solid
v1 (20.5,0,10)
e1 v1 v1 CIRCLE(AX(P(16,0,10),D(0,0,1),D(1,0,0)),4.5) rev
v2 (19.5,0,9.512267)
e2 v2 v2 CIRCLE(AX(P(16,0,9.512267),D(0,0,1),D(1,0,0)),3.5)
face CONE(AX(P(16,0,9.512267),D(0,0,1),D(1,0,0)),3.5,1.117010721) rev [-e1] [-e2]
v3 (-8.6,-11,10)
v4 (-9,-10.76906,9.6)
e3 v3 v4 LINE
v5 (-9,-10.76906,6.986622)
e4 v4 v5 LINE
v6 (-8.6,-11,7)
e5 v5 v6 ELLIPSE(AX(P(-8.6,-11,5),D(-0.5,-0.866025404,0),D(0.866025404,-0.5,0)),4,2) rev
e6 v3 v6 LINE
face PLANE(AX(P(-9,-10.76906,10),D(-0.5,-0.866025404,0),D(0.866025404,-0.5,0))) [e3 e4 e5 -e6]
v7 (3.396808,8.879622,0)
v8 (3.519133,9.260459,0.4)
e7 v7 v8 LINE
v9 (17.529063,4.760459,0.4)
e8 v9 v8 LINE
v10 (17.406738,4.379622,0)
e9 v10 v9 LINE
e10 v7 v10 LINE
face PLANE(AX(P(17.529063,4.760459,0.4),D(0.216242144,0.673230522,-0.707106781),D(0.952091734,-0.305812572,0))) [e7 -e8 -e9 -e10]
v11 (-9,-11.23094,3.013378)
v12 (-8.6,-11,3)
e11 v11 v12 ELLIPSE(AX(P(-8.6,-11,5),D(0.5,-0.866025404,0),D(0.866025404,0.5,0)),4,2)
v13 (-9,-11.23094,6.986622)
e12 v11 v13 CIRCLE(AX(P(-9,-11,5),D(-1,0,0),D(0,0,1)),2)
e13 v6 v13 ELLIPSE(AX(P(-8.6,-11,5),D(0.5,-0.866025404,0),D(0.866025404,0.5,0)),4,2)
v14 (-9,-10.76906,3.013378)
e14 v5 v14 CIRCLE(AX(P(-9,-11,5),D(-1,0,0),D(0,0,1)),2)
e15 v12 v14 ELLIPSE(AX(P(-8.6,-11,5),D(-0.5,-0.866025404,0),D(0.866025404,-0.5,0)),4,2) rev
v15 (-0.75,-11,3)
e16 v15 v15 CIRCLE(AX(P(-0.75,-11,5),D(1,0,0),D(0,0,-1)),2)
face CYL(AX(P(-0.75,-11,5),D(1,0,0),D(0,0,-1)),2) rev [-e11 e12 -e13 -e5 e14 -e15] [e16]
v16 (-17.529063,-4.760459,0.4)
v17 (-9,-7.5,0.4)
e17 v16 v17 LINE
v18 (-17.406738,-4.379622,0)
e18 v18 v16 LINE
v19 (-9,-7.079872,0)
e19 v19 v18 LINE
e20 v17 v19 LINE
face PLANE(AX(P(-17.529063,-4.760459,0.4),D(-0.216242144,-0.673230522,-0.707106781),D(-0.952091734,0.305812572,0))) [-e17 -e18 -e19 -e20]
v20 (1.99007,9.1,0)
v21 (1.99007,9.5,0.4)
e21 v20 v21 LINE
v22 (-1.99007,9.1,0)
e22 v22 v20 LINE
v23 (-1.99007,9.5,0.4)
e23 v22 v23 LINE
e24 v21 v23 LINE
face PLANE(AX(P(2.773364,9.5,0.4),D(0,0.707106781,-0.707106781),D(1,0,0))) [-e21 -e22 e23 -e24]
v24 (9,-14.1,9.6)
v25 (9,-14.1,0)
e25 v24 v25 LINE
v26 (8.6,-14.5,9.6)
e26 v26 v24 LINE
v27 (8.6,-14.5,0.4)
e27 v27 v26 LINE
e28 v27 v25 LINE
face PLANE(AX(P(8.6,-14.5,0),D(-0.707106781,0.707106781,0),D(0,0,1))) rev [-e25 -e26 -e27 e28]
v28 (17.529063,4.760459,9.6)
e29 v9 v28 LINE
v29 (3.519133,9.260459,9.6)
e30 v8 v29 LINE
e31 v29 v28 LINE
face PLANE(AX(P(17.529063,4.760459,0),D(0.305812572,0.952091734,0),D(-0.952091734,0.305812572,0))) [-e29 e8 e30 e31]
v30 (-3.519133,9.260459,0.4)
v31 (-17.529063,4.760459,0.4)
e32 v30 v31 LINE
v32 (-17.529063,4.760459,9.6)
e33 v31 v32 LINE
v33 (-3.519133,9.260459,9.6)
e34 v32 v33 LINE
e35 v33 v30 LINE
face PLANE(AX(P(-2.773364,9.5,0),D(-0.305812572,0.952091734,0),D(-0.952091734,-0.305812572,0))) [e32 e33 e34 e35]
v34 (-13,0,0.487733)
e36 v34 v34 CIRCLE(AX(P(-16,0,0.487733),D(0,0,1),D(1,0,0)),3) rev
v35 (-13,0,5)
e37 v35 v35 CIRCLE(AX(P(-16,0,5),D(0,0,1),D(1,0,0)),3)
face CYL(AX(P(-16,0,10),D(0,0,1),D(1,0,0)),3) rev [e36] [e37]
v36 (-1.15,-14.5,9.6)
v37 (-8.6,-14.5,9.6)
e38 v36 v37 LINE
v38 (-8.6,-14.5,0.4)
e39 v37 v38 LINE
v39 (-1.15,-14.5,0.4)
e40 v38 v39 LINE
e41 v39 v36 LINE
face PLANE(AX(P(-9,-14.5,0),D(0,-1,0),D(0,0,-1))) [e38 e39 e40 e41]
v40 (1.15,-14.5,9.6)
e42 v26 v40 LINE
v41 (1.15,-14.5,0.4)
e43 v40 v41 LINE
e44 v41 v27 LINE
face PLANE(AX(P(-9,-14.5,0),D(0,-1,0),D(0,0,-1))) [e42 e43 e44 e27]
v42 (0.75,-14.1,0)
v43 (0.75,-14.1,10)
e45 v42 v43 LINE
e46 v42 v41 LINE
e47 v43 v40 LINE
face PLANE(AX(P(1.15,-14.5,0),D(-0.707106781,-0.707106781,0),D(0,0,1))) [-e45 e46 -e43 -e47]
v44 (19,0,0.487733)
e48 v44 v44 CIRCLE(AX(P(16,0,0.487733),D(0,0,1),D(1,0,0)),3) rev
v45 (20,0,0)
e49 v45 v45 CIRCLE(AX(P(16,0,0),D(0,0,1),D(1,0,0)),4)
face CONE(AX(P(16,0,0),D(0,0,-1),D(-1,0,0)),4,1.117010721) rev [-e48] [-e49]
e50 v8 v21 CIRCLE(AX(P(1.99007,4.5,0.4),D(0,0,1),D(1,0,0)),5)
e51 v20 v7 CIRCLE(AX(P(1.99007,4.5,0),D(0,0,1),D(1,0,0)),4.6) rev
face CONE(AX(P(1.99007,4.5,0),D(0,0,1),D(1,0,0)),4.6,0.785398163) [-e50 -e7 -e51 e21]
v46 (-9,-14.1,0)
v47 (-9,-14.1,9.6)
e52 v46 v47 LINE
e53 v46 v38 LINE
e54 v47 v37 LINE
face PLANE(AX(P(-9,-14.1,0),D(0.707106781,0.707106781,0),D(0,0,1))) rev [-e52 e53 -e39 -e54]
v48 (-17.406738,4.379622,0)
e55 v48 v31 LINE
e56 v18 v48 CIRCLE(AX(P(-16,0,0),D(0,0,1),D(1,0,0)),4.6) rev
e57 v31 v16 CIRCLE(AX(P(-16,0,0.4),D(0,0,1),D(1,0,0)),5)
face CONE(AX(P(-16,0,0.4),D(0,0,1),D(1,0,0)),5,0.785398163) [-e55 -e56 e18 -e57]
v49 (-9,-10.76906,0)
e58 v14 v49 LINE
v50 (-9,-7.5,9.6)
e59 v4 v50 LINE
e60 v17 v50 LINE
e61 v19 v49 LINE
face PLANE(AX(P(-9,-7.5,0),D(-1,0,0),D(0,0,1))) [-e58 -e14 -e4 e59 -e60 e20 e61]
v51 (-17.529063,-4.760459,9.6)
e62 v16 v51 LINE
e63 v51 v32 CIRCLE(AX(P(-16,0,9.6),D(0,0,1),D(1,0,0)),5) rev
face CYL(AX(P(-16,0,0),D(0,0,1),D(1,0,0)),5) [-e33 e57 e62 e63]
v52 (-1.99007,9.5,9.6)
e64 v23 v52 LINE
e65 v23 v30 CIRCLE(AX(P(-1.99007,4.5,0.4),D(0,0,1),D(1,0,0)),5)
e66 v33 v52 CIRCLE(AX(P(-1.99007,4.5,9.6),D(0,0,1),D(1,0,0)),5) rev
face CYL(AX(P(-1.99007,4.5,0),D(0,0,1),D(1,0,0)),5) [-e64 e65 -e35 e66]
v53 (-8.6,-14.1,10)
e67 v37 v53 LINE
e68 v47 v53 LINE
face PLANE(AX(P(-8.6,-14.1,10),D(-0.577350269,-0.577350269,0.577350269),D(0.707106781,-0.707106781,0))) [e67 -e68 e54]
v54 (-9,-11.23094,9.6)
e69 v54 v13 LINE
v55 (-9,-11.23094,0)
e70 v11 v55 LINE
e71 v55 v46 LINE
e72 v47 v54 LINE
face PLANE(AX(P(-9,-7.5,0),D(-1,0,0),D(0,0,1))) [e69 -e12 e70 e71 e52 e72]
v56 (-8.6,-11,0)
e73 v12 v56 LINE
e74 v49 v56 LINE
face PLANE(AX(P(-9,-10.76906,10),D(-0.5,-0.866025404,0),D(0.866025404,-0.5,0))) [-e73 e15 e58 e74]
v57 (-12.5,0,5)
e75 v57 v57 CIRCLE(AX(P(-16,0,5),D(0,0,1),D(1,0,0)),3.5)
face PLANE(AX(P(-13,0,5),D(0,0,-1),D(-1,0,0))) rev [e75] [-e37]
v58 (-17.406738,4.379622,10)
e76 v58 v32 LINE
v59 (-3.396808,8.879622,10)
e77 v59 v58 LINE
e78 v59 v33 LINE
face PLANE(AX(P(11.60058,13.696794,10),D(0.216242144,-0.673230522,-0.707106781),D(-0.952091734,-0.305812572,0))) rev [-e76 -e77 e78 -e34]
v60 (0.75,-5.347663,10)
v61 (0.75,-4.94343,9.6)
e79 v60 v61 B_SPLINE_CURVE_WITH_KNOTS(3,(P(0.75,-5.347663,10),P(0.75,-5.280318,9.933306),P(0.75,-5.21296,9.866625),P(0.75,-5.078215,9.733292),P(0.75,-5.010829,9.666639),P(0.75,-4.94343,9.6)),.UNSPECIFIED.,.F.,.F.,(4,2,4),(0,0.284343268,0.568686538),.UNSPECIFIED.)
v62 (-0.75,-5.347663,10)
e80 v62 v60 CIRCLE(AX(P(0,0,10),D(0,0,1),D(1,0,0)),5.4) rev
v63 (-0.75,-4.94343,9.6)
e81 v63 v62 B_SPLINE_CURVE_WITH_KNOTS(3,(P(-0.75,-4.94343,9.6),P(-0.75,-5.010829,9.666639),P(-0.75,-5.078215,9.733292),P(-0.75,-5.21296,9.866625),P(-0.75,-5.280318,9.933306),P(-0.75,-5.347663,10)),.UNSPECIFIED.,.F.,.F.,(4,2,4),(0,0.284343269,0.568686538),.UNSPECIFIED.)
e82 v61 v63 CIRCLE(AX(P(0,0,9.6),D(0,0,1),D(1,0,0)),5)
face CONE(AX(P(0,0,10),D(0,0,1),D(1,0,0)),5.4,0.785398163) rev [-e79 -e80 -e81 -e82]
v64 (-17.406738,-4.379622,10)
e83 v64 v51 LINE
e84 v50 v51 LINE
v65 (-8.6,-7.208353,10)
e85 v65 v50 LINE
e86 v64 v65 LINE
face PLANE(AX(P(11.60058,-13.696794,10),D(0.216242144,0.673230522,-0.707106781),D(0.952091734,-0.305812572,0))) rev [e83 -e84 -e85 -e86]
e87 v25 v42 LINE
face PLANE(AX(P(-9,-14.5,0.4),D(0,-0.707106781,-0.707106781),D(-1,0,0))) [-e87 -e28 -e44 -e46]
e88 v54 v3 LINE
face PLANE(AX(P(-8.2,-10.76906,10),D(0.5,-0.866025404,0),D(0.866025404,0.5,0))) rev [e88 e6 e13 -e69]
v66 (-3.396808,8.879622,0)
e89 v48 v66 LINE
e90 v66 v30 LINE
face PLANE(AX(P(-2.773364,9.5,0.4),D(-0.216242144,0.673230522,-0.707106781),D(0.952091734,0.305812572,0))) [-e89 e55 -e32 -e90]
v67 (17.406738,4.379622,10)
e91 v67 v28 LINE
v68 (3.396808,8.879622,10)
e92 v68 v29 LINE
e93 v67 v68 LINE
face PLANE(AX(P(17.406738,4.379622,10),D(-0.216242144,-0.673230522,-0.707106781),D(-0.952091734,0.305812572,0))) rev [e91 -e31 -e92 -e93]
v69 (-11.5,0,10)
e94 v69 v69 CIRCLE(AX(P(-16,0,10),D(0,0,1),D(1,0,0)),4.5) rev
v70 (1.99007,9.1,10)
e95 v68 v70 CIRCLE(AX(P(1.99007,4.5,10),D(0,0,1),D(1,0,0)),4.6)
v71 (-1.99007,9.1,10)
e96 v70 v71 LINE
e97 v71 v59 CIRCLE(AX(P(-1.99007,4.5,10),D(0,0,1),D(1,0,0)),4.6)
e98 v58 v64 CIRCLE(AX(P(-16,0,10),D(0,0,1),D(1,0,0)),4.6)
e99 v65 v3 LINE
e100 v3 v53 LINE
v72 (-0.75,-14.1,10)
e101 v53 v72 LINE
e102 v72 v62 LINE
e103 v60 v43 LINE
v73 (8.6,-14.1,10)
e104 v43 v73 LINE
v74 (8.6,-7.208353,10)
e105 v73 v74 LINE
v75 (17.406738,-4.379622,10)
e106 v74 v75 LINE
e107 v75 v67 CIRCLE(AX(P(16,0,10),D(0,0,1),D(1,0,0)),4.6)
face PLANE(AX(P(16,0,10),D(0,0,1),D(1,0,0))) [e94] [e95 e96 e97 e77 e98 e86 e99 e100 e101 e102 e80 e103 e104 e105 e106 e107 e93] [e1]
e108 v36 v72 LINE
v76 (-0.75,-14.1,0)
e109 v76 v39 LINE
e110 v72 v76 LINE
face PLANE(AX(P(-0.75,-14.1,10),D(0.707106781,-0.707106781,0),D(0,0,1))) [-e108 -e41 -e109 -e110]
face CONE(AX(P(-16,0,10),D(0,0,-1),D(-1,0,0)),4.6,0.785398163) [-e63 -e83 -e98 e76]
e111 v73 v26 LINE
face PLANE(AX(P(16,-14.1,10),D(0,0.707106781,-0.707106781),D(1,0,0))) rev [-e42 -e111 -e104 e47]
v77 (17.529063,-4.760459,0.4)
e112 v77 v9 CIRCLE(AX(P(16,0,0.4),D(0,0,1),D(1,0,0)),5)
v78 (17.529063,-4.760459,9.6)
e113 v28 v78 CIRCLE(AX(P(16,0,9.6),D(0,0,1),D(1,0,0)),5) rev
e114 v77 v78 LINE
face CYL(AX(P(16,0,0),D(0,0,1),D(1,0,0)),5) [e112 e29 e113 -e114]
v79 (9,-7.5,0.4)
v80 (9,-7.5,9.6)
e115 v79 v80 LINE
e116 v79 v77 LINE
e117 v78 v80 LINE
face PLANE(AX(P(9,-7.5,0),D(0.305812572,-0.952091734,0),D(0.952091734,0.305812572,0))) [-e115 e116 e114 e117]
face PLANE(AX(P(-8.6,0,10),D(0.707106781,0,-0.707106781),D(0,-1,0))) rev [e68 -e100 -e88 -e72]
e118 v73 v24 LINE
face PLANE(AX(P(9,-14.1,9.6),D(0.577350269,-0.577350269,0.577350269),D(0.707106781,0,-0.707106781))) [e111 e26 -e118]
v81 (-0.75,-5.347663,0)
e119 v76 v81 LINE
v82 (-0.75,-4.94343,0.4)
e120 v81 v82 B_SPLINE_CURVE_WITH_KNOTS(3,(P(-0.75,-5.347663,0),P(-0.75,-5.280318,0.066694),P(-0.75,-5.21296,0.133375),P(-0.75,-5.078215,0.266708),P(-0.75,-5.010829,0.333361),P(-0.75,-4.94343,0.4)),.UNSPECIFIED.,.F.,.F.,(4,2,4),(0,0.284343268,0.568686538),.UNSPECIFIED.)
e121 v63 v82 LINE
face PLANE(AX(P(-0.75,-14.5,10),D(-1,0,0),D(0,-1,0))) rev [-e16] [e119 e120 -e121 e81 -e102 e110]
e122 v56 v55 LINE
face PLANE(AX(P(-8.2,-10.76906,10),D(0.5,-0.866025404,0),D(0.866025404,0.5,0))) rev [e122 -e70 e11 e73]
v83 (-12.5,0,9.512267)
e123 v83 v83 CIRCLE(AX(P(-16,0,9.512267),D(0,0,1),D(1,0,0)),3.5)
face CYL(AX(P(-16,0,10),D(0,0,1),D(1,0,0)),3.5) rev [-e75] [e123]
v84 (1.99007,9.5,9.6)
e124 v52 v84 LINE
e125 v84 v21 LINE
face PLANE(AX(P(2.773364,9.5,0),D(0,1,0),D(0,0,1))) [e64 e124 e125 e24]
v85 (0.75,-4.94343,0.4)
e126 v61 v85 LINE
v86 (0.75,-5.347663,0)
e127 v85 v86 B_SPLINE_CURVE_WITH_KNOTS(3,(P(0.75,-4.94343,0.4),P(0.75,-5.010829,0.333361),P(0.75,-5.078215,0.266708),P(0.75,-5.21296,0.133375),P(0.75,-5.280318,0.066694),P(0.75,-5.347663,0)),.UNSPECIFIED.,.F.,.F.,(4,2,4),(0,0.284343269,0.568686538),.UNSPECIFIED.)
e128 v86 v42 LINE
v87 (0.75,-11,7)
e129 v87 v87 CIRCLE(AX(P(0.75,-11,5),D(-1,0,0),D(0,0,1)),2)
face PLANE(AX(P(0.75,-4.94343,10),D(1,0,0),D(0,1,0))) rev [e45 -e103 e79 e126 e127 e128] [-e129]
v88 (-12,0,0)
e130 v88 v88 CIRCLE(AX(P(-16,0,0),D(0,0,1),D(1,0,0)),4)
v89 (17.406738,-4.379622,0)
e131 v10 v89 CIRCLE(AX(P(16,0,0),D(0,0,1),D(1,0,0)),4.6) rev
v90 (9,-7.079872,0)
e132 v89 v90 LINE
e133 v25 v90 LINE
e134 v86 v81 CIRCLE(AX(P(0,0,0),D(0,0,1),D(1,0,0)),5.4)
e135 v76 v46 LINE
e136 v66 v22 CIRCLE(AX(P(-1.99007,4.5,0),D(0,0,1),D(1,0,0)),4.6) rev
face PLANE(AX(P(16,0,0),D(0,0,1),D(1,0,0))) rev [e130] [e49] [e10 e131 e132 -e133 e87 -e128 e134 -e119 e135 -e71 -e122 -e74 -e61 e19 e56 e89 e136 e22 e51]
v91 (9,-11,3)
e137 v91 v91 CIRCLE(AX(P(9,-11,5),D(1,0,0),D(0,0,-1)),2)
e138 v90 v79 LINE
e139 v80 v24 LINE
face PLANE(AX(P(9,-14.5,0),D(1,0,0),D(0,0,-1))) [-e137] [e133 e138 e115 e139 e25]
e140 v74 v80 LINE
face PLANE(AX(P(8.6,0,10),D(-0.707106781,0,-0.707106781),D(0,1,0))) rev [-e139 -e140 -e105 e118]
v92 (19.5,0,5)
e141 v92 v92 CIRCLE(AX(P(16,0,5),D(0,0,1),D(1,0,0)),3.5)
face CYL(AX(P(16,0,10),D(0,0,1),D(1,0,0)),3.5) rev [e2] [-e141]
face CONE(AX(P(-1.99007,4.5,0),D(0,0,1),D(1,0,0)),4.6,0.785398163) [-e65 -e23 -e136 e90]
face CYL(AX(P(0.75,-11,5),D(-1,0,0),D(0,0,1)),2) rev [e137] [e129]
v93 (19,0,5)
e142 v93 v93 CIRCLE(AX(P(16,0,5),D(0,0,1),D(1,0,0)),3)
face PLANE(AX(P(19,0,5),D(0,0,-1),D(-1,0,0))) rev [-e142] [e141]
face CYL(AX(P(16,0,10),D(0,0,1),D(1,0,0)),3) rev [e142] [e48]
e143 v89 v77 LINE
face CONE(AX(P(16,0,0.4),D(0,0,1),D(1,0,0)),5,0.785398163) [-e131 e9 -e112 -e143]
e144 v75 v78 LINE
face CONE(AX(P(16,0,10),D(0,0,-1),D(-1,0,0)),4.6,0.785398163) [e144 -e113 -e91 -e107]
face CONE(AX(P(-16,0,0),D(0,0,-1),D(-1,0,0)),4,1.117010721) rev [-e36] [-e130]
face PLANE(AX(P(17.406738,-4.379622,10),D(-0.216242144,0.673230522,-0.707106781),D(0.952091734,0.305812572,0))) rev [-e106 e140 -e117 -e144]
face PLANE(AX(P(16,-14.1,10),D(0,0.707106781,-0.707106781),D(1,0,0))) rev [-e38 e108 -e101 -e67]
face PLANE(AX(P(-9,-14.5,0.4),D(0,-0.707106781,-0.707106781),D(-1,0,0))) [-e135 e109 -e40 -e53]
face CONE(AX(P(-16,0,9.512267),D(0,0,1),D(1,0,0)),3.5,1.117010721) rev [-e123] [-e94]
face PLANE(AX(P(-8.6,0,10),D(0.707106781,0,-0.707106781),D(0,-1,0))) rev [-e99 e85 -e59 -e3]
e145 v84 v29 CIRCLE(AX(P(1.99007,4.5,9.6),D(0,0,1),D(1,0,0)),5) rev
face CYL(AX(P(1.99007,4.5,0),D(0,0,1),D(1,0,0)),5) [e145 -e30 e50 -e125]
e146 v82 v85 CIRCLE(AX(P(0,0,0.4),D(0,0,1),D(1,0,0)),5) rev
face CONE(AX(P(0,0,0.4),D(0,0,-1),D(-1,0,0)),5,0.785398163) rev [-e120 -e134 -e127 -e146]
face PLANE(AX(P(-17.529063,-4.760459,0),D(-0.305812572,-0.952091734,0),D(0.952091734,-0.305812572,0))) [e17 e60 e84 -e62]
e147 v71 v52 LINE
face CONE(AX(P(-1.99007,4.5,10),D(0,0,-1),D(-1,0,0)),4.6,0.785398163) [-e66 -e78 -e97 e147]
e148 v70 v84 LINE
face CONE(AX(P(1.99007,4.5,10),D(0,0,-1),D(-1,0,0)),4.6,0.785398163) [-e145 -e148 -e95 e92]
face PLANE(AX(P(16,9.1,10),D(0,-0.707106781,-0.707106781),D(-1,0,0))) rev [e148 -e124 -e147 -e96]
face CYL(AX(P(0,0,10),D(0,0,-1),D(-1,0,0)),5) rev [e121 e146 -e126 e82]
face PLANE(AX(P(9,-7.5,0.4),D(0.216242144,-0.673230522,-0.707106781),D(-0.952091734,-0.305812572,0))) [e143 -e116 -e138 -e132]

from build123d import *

# Parameters (mm, degrees)
BOSS_EXTRUDE1_DEPTH             = 10
CUT_EXTRUDE1_DEPTH              = 28.408940147
CUT_EXTRUDE2_DEPTH              = 28.408940147
DRAFT1_ANGLE                    = 30
SKETCH4_W                       = 5
SKETCH4_H                       = 10
SKETCH5_W                       = 2
SKETCH5_H                       = 20.25
F_4_0_4_DIAMETER_HOLE2_D        = 4
F_4_0_4_DIAMETER_HOLE2_DEPTH    = 20.25
M7X1_0_TAPPED_HOLE1_D           = 6
M7X1_0_TAPPED_HOLE1_CBORE_D     = 7
M7X1_0_TAPPED_HOLE1_CBORE_DEPTH = 5
FILLET1_R                       = 5
CHAMFER1_SIZE                   = 1
CHAMFER1_SIZE2                  = 0.487732589
CHAMFER2_SIZE                   = 0.4
CHAMFER3_SIZE                   = 1
CHAMFER3_SIZE2                  = 0.487732589


with BuildPart() as part:
    # Sketch1 → Boss-Extrude1 (new body)
    with BuildSketch(Plane.XY.offset(10)):
        with BuildLine():
            Line((-9, -7.5), (-9, -14.5))
            Line((-9, -14.5), (9, -14.5))
            Line((9, -14.5), (9, -7.5))
            Line((9, -7.5), (17.529062862, -4.760458672))
            ThreePointArc((17.529062862, -4.760458672), (21, 0), (17.529062862, 4.760458672))
            Line((17.529062862, 4.760458672), (2.773364341, 9.5))
            Line((2.773364341, 9.5), (-2.773364341, 9.5))
            Line((-2.773364341, 9.5), (-17.529062862, 4.760458672))
            ThreePointArc((-17.529062862, 4.760458672), (-21, 0), (-17.529062862, -4.760458672))
            Line((-17.529062862, -4.760458672), (-9, -7.5))
        make_face()
    extrude(amount=-BOSS_EXTRUDE1_DEPTH)

    # Sketch2 → Cut-Extrude1 (cut, through all)
    with BuildSketch(Plane(origin=(0, 0, 0), x_dir=(-1, 0, 0), z_dir=(0, 0, -1))):
        Polygon((9, -11.230940108), (9, -10.769059892), (8.2, -10.769059892), align=None)
    extrude(amount=-CUT_EXTRUDE1_DEPTH, mode=Mode.SUBTRACT)

    # Sketch3 → Cut-Extrude2 (cut, through all)
    with BuildSketch(Plane(origin=(0, 0, 0), x_dir=(-1, 0, 0), z_dir=(0, 0, -1))):
        with BuildLine():
            Line((0.75, -14.5), (0.75, -4.943429983))
            ThreePointArc((0.75, -4.943429983), (0, -5), (-0.75, -4.943429983))
            Line((-0.75, -4.943429983), (-0.75, -14.5))
            Line((-0.75, -14.5), (0.75, -14.5))
        make_face()
    extrude(amount=-CUT_EXTRUDE2_DEPTH, mode=Mode.SUBTRACT)

    # Draft1
    draft1_faces = [part.faces().sort_by_distance(p)[0] for p in [
        (-8.6, -10.769059892, 5),
    ]]
    draft(draft1_faces, Plane(origin=(-9, -7.5, 0), x_dir=(0, 0, -1), z_dir=(-1, 0, 0)), DRAFT1_ANGLE)

    # Sketch4 → Cut-Revolve1 (revolve, cut)
    with BuildSketch(Plane.XZ):
        with Locations((2.5, 5)):
            Rectangle(SKETCH4_W, SKETCH4_H)
    revolve(axis=Axis((0, 0, 10), (0, 0, -1)), mode=Mode.SUBTRACT)

    # Sketch5 → Ø4.0 (4) Diameter Hole1 (revolve, cut)
    with BuildSketch(Plane(origin=(-0.75, -11, 5), x_dir=(0, 0, -1), z_dir=(0, 1, 0))):
        with Locations((1, 10.125)):
            Rectangle(SKETCH5_W, SKETCH5_H)
    revolve(axis=Axis((5.6, -11, 5), (-1, 0, 0)), mode=Mode.SUBTRACT)

    # Ø4.0 (4) Diameter Hole2
    with Locations(Plane.ZY.offset(-0.75)):
        with Locations((5, -11)):
            Hole(F_4_0_4_DIAMETER_HOLE2_D / 2, depth=F_4_0_4_DIAMETER_HOLE2_DEPTH)

    # M7x1.0 Tapped Hole1 (through all)
    with Locations(Plane.XY.offset(10)):
        with Locations((-16, 0), (16, 0)):
            CounterBoreHole(M7X1_0_TAPPED_HOLE1_D / 2, M7X1_0_TAPPED_HOLE1_CBORE_D / 2, M7X1_0_TAPPED_HOLE1_CBORE_DEPTH)

    # Fillet1
    fillet1_edges = [part.edges().sort_by_distance(p)[0] for p in [
        (-2.773364341, 9.5, 5),
        (2.773364341, 9.5, 5),
    ]]
    fillet(fillet1_edges, radius=FILLET1_R)

    # Chamfer1
    chamfer1_edges = [part.edges().sort_by_distance(p)[0] for p in [
        (12.5, 0, 10),
        (-19.5, 0, 10),
    ]]
    chamfer1_side = [part.faces().sort_by_distance(p)[0] for p in [
        (0, 9.016264535, 10),
    ]]
    chamfer(chamfer1_edges, length=CHAMFER1_SIZE, length2=CHAMFER1_SIZE2, reference=chamfer1_side[0])

    # Chamfer2
    chamfer2_edges = [part.edges().sort_by_distance(p)[0] for p in [
        (13.264531431, -6.130229336, 0),
        (21, 0, 0),
        (10.524097746, 7.010458672, 0),
        (2.763925905, 9.439751682, 0),
        (0, 9.5, 0),
        (-2.763925905, 9.439751682, 0),
        (-10.524097746, 7.010458672, 0),
        (-13.264531431, -6.130229336, 0),
        (-21, 0, 0),
        (-9, -9.134529946, 10),
        (-13.264531431, -6.130229336, 10),
        (-21, 0, 10),
        (-10.524097746, 7.010458672, 10),
        (-2.763925905, 9.439751682, 10),
        (0, 9.5, 10),
        (2.763925905, 9.439751682, 10),
        (10.524097746, 7.010458672, 10),
        (21, 0, 10),
        (13.264531431, -6.130229336, 10),
        (9, -11, 10),
        (4.875, -14.5, 10),
        (9, -14.5, 5),
        (0.75, -14.5, 5),
        (4.875, -14.5, 0),
        (0, 5, 10),
        (-9, -12.865470054, 10),
        (-9, -14.5, 5),
        (-4.875, -14.5, 0),
        (-0.75, -14.5, 5),
        (-4.875, -14.5, 10),
        (0, 5, 0),
    ]]
    chamfer(chamfer2_edges, length=CHAMFER2_SIZE - 0.0001)  # a hair under: the kernel refuses the full size

    # Chamfer3
    chamfer3_edges = [part.edges().sort_by_distance(p)[0] for p in [
        (19, 0, 0),
        (-13, 0, 0),
    ]]
    chamfer3_side = [part.faces().sort_by_distance(p)[0] for p in [
        (4.875, -13.627267497, 0),
    ]]
    chamfer(chamfer3_edges, length=CHAMFER3_SIZE, length2=CHAMFER3_SIZE2, reference=chamfer3_side[0])


solid = part.part
